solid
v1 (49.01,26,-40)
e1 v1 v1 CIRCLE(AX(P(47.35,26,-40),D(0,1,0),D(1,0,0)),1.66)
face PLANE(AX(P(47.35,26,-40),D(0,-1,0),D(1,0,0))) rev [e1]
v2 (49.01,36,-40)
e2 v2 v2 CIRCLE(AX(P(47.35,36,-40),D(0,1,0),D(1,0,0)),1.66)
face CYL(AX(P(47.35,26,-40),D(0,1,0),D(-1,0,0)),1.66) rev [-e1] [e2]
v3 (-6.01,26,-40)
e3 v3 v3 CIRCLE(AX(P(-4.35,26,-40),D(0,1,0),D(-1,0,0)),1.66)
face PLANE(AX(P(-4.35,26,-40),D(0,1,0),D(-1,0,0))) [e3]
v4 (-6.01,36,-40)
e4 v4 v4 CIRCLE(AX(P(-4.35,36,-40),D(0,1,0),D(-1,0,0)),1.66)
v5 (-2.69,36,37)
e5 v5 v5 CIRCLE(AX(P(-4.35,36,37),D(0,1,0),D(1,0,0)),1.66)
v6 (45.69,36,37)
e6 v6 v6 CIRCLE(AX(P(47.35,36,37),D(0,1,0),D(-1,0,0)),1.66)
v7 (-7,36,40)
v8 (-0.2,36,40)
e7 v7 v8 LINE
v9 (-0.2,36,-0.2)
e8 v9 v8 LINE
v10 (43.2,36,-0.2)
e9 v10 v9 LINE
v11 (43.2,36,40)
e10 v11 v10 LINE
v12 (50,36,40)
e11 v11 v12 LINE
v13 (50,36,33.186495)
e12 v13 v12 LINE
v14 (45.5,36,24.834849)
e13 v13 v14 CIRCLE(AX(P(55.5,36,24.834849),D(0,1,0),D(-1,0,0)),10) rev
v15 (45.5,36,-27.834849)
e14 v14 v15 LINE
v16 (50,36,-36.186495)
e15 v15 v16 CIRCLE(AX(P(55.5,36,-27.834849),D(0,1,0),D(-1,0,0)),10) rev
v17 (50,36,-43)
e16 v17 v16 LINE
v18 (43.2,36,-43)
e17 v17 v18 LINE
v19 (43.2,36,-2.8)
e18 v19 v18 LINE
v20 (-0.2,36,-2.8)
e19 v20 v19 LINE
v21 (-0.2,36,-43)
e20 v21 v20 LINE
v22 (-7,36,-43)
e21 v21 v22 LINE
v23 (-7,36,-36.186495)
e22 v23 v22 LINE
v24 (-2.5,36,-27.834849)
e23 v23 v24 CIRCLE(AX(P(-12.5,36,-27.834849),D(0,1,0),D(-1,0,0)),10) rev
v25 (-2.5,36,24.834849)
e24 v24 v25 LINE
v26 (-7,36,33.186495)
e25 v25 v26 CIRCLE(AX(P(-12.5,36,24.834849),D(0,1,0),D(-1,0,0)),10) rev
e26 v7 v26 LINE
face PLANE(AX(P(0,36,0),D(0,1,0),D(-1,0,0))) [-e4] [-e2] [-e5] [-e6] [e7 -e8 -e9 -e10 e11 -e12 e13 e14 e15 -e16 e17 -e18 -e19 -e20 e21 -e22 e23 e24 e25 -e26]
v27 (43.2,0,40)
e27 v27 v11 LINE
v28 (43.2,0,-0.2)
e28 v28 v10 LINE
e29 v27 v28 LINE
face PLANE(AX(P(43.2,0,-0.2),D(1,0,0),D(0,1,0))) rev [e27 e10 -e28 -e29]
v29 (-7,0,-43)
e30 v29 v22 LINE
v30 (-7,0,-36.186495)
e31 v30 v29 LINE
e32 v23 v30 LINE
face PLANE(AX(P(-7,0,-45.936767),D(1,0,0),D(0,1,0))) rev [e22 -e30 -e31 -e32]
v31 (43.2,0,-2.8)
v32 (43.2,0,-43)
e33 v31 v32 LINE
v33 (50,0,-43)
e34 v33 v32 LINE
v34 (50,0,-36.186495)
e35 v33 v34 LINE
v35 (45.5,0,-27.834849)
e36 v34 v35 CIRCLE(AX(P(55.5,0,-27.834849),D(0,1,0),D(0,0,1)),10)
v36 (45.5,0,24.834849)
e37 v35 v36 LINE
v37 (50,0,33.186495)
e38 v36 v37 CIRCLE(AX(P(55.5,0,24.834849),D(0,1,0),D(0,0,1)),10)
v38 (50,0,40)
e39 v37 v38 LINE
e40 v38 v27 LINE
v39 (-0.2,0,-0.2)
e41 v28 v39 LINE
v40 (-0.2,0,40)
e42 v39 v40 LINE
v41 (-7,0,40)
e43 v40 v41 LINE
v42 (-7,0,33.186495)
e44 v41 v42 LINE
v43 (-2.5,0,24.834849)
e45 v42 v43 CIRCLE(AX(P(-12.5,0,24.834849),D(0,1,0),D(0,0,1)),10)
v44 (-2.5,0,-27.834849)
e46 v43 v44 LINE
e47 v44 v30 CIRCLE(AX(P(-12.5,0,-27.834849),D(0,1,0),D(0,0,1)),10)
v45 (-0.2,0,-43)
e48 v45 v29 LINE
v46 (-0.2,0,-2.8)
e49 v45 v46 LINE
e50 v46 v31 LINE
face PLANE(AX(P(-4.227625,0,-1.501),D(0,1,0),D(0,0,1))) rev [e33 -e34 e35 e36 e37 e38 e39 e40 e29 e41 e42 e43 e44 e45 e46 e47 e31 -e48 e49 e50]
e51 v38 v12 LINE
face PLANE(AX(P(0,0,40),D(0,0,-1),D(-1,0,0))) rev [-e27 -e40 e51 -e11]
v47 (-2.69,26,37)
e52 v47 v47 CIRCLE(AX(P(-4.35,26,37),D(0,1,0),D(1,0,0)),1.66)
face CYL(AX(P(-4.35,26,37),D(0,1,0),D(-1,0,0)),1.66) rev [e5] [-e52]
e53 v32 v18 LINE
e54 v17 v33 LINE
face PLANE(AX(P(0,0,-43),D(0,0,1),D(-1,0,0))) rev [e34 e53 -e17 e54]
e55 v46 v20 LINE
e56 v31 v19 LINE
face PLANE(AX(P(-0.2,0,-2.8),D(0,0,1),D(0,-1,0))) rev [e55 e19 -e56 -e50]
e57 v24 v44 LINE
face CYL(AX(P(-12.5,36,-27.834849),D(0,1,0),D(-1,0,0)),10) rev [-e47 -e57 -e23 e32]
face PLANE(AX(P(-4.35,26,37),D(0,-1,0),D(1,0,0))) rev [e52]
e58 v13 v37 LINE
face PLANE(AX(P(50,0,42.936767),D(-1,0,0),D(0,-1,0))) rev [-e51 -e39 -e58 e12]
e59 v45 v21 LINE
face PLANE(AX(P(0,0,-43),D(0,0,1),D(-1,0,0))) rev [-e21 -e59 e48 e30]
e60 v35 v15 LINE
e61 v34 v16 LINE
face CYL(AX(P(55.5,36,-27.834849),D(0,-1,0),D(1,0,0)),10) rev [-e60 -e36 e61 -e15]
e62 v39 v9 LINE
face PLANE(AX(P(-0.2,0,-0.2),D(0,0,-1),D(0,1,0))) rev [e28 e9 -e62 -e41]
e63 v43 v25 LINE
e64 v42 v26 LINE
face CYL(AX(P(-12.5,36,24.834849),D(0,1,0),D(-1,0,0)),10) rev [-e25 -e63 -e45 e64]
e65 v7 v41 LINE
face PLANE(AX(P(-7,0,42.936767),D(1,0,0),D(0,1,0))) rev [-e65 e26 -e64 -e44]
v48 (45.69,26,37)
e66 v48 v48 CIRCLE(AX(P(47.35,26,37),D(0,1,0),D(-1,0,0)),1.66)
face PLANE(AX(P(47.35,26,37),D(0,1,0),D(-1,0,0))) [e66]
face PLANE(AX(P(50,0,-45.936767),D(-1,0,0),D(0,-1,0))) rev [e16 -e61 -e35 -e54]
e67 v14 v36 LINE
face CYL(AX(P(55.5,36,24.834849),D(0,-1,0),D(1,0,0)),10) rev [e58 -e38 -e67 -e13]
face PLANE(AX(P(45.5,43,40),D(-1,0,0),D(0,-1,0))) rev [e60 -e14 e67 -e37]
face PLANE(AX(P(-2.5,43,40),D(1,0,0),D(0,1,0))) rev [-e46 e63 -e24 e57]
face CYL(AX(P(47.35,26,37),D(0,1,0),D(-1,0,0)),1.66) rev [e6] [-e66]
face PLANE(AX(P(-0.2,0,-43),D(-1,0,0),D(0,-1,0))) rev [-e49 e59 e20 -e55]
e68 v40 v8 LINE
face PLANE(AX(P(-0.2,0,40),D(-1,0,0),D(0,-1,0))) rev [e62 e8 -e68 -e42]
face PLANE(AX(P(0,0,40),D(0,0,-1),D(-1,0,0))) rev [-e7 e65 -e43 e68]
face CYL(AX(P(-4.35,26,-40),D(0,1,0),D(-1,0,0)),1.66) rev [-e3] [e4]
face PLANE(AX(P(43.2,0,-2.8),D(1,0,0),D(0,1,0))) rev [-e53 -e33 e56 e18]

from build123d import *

# Parameters (mm, degrees)
ESQUISSE1_W                  = 43
ESQUISSE1_H                  = 43
BOSS_EXTRU_1_DEPTH           = 40
ESQUISSE2_W                  = 48
ESQUISSE2_H                  = 48
BOSS_EXTRU_2_DEPTH           = 1.5
ENL_V_MAT_EXTRU_3_REACH      = 79.293
ESQUISSE5_W                  = 8
ESQUISSE5_H                  = 5
ENL_V_MAT_EXTRU_4_REACH      = 78.569
ESQUISSE6_W                  = 54.781223227
ESQUISSE6_H                  = 3.078773465
ENL_V_MAT_EXTRU_5_DEPTH      = 9.5
ENL_V_MAT_EXTRU_6_DEPTH      = 73.216687822
ENL_V_MAT_EXTRU_6_DEPTH_BACK = 73.216687822
ESQUISSE9_W                  = 82.255914314
ESQUISSE9_H                  = 90.950558943
ENL_V_MAT_EXTRU_7_DEPTH      = 9.5
ESQUISSE10_W                 = 6
ESQUISSE10_H                 = 36
BOSS_EXTRU_3_DEPTH           = 6
CONG_1_R                     = 10
ESQUISSE11_W                 = 6
ESQUISSE11_H                 = 36
BOSS_EXTRU_4_DEPTH           = 6
CONG_2_R                     = 10
ESQUISSE12_R                 = 1.66
ENL_V_MAT_EXTRU_8_DEPTH      = 10
ESQUISSE13_W                 = 5.657897309
ESQUISSE13_H                 = 15.126215254
ENL_V_MAT_EXTRU_9_DEPTH      = 77.139674284


with BuildPart() as part:
    # Esquisse1 → Boss.-Extru.1 (new body)
    with BuildSketch(Plane.XY):
        Polygon((-2.5, 43), (-2.5, -2.5), (0, -2.5), (45.5, -2.5), (45.5, 43), (45.5, 45.5), (-2.5, 45.5), align=None)
        with Locations((21.5, 21.5)):
            Rectangle(ESQUISSE1_W, ESQUISSE1_H, mode=Mode.SUBTRACT)
    extrude(amount=BOSS_EXTRU_1_DEPTH)

    # Esquisse2 → Boss.-Extru.2 (add)
    with BuildSketch(Plane.XY):
        with Locations((21.5, 21.5)):
            Rectangle(ESQUISSE2_W, ESQUISSE2_H)
    extrude(amount=-BOSS_EXTRU_2_DEPTH)

    # Esquisse5 → Enlèv. mat.-Extru.3 (cut, up to next)
    with BuildSketch(Plane(origin=(0, 45.5, 0), x_dir=(1, 0, 0), z_dir=(0, 1, 0)), mode=Mode.PRIVATE) as enl_v_mat_extru_3_sk1:
        with Locations((21.5, -6.3)):
            Rectangle(ESQUISSE5_W, ESQUISSE5_H)
    enl_v_mat_extru_3_tool1 = extrude(enl_v_mat_extru_3_sk1.sketch, amount=-ENL_V_MAT_EXTRU_3_REACH, mode=Mode.PRIVATE) & part.part
    add(enl_v_mat_extru_3_tool1.solids().sort_by_distance((21.5, 45.5, 6.3))[0], mode=Mode.SUBTRACT)

    # Esquisse6 → Enlèv. mat.-Extru.4 (cut, up to next)
    with BuildSketch(Plane.XY.offset(40), mode=Mode.PRIVATE) as enl_v_mat_extru_4_sk1:
        with Locations((23.162986277, -1.539386733)):
            Rectangle(ESQUISSE6_W, ESQUISSE6_H)
    enl_v_mat_extru_4_tool1 = extrude(enl_v_mat_extru_4_sk1.sketch, amount=-ENL_V_MAT_EXTRU_4_REACH, mode=Mode.PRIVATE) & part.part
    add(enl_v_mat_extru_4_tool1.solids().sort_by_distance((23.162986, -1.539387, 40))[0], mode=Mode.SUBTRACT)

    # Symétrie1: part across plane


with BuildPart() as part_1:
    add(part.part)
    add(part.part.mirror(Plane.XY.offset(-1.5)))

    # Esquisse7 → Enlèv. mat.-Extru.5 (cut)
    with BuildSketch(Plane(origin=(0, 45.5, 0), x_dir=(1, 0, 0), z_dir=(0, 1, 0))):
        Polygon((-2.5, 7.8), (0, 7.8), (0, 12.8), (-2.5, 12.8), (-2.5, 25.4), (0, 25.4), (0, 30.4), (-2.5, 30.4), (-2.5, 43), (45.5, 43), (45.5, 30.4), (43, 30.4), (43, 25.4), (45.5, 25.4), (45.5, 12.8), (43, 12.8), (43, 7.8), (45.5, 7.8), (45.5, -4.8), (43, -4.8), (43, -9.8), (45.5, -9.8), (45.5, -22.4), (43, -22.4), (43, -27.4), (45.5, -27.4), (45.5, -40), (-2.5, -40), (-2.5, -27.4), (0, -27.4), (0, -22.4), (-2.5, -22.4), (-2.5, -9.8), (0, -9.8), (0, -4.8), (-2.5, -4.8), align=None)
    extrude(amount=-ENL_V_MAT_EXTRU_5_DEPTH, mode=Mode.SUBTRACT)

    # Esquisse8 → Enlèv. mat.-Extru.6 (cut, two sides: drawn at the far end of the back side and taken through both)
    with BuildSketch(Plane(origin=(0, 36, 0), x_dir=(1, 0, 0), z_dir=(0, 1, 0)).offset(-ENL_V_MAT_EXTRU_6_DEPTH_BACK)):
        Polygon((-0.2, 43), (-0.2, 2.8), (43.2, 2.8), (43.2, 43), (43, 43), (43, 3), (0, 3), (0, 43), align=None)
        Polygon((0, 0), (0, -40), (-0.2, -40), (-0.2, 0.2), (43.2, 0.2), (43.2, -40), (43, -40), (43, 0), align=None)
    extrude(amount=ENL_V_MAT_EXTRU_6_DEPTH + ENL_V_MAT_EXTRU_6_DEPTH_BACK, mode=Mode.SUBTRACT)

    # Esquisse9 → Enlèv. mat.-Extru.7 (cut)
    with BuildSketch(Plane(origin=(0, 45.5, 0), x_dir=(1, 0, 0), z_dir=(0, 1, 0))):
        with Locations((21.348833146, 1.614403219)):
            Rectangle(ESQUISSE9_W, ESQUISSE9_H)
    extrude(amount=-ENL_V_MAT_EXTRU_7_DEPTH, mode=Mode.SUBTRACT)

    # Esquisse10 → Boss.-Extru.3 (add)
    with BuildSketch(Plane(origin=(45.5, 0, 0), x_dir=(0, 0, -1), z_dir=(1, 0, 0))):
        with Locations((-37, 18)):
            Rectangle(ESQUISSE10_W, ESQUISSE10_H)
        with Locations((40, 18)):
            Rectangle(ESQUISSE10_W, ESQUISSE10_H)
    extrude(amount=BOSS_EXTRU_3_DEPTH)

    # Congé1
    # the kernel refuses this fillet: 10 mm, written as the material it adds along each edge
    with BuildSketch(Plane(origin=(45.5, 36, 34), x_dir=(1, 0, 0), z_dir=(0, -1, 0))) as cong_1_piece_1:
        with BuildLine():
            CenterArc((10, -9.16515139), CONG_1_R, 113.578178478, 66.421821522)
            Line((0, -9.16515139), (-0.2, -9.16515139))
            Line((-0.2, -9.16515139), (-0.2, 0))
            Line((-0.2, 0), (0, 0.2))
            ThreePointArc((0, 0.2), (3, 0.2), (5.92, 0.183303028))
            Line((5.92, 0.183303028), (6, 0))
        make_face()
    extrude(amount=36)
    with BuildSketch(Plane(origin=(45.5, 36, -37), x_dir=(0, 0, 1), z_dir=(0, -1, 0))) as cong_1_piece_2:
        with BuildLine():
            CenterArc((9.16515139, -10), CONG_1_R, 90, 66.421821522)
            Line((0, -6), (-0.183303028, -5.92))
            ThreePointArc((-0.183303028, -5.92), (-0.2, -3), (-0.2, 0))
            Line((-0.2, 0), (0, 0.2))
            Line((0, 0.2), (9.16515139, 0.2))
            Line((9.16515139, 0.2), (9.16515139, 0))
        make_face()
    extrude(amount=36)

    # Esquisse11 → Boss.-Extru.4 (add)
    with BuildSketch(Plane.ZY.offset(2.5)):
        with Locations((-40, 18)):
            Rectangle(ESQUISSE11_W, ESQUISSE11_H)
        with Locations((37, 18)):
            Rectangle(ESQUISSE11_W, ESQUISSE11_H)
    extrude(amount=BOSS_EXTRU_4_DEPTH)

    # Congé2
    # the kernel refuses this fillet: 10 mm, written as the material it adds along each edge
    with BuildSketch(Plane(origin=(-2.5, 0, 34), x_dir=(-1, 0, 0), z_dir=(0, 1, 0))) as cong_2_piece_1:
        with BuildLine():
            CenterArc((10, -9.16515139), CONG_2_R, 113.578178478, 66.421821522)
            Line((0, -9.16515139), (-0.2, -9.16515139))
            Line((-0.2, -9.16515139), (-0.2, 0))
            Line((-0.2, 0), (0, 0.2))
            ThreePointArc((0, 0.2), (3, 0.2), (5.92, 0.183303028))
            Line((5.92, 0.183303028), (6, 0))
        make_face()
    extrude(amount=36)
    with BuildSketch(Plane(origin=(-2.5, 36, -37), x_dir=(0, 0, 1), z_dir=(0, -1, 0))) as cong_2_piece_2:
        with BuildLine():
            CenterArc((9.16515139, 10), CONG_2_R, 203.578178478, 66.421821522)
            Line((0, 6), (-0.183303028, 5.92))
            ThreePointArc((-0.183303028, 5.92), (-0.2, 3), (-0.2, 0))
            Line((-0.2, 0), (0, -0.2))
            Line((0, -0.2), (9.16515139, -0.2))
            Line((9.16515139, -0.2), (9.16515139, 0))
        make_face()
    extrude(amount=36)

    # Esquisse12 → Enlèv. mat.-Extru.8 (cut)
    with BuildSketch(Plane(origin=(0, 36, 0), x_dir=(1, 0, 0), z_dir=(0, 1, 0))):
        with Locations(Location((-4.35, 40, 0), (0, 0, 180))):
            Circle(ESQUISSE12_R)
        with Locations((47.35, 40)):
            Circle(ESQUISSE12_R)
        with Locations(Location((47.35, -37, 0), (0, 0, 180))):
            Circle(ESQUISSE12_R)
        with Locations((-4.35, -37)):
            Circle(ESQUISSE12_R)
    extrude(amount=-ENL_V_MAT_EXTRU_8_DEPTH, mode=Mode.SUBTRACT)

    # Esquisse13 → Enlèv. mat.-Extru.9 (cut, through all)
    with BuildSketch(Plane(origin=(0, 36, 0), x_dir=(1, 0, 0), z_dir=(0, 1, 0))):
        with Locations((52.828948655, 38.373658998)):
            Rectangle(ESQUISSE13_W, ESQUISSE13_H)
        with Locations((52.828948655, -35.373658998)):
            Rectangle(ESQUISSE13_W, ESQUISSE13_H)
        with Locations((-9.828948654, 38.373658998)):
            Rectangle(ESQUISSE13_W, ESQUISSE13_H)
        with Locations((-9.828948654, -35.373658998)):
            Rectangle(ESQUISSE13_W, ESQUISSE13_H)
    extrude(amount=-ENL_V_MAT_EXTRU_9_DEPTH, mode=Mode.SUBTRACT)


solid = part_1.part
